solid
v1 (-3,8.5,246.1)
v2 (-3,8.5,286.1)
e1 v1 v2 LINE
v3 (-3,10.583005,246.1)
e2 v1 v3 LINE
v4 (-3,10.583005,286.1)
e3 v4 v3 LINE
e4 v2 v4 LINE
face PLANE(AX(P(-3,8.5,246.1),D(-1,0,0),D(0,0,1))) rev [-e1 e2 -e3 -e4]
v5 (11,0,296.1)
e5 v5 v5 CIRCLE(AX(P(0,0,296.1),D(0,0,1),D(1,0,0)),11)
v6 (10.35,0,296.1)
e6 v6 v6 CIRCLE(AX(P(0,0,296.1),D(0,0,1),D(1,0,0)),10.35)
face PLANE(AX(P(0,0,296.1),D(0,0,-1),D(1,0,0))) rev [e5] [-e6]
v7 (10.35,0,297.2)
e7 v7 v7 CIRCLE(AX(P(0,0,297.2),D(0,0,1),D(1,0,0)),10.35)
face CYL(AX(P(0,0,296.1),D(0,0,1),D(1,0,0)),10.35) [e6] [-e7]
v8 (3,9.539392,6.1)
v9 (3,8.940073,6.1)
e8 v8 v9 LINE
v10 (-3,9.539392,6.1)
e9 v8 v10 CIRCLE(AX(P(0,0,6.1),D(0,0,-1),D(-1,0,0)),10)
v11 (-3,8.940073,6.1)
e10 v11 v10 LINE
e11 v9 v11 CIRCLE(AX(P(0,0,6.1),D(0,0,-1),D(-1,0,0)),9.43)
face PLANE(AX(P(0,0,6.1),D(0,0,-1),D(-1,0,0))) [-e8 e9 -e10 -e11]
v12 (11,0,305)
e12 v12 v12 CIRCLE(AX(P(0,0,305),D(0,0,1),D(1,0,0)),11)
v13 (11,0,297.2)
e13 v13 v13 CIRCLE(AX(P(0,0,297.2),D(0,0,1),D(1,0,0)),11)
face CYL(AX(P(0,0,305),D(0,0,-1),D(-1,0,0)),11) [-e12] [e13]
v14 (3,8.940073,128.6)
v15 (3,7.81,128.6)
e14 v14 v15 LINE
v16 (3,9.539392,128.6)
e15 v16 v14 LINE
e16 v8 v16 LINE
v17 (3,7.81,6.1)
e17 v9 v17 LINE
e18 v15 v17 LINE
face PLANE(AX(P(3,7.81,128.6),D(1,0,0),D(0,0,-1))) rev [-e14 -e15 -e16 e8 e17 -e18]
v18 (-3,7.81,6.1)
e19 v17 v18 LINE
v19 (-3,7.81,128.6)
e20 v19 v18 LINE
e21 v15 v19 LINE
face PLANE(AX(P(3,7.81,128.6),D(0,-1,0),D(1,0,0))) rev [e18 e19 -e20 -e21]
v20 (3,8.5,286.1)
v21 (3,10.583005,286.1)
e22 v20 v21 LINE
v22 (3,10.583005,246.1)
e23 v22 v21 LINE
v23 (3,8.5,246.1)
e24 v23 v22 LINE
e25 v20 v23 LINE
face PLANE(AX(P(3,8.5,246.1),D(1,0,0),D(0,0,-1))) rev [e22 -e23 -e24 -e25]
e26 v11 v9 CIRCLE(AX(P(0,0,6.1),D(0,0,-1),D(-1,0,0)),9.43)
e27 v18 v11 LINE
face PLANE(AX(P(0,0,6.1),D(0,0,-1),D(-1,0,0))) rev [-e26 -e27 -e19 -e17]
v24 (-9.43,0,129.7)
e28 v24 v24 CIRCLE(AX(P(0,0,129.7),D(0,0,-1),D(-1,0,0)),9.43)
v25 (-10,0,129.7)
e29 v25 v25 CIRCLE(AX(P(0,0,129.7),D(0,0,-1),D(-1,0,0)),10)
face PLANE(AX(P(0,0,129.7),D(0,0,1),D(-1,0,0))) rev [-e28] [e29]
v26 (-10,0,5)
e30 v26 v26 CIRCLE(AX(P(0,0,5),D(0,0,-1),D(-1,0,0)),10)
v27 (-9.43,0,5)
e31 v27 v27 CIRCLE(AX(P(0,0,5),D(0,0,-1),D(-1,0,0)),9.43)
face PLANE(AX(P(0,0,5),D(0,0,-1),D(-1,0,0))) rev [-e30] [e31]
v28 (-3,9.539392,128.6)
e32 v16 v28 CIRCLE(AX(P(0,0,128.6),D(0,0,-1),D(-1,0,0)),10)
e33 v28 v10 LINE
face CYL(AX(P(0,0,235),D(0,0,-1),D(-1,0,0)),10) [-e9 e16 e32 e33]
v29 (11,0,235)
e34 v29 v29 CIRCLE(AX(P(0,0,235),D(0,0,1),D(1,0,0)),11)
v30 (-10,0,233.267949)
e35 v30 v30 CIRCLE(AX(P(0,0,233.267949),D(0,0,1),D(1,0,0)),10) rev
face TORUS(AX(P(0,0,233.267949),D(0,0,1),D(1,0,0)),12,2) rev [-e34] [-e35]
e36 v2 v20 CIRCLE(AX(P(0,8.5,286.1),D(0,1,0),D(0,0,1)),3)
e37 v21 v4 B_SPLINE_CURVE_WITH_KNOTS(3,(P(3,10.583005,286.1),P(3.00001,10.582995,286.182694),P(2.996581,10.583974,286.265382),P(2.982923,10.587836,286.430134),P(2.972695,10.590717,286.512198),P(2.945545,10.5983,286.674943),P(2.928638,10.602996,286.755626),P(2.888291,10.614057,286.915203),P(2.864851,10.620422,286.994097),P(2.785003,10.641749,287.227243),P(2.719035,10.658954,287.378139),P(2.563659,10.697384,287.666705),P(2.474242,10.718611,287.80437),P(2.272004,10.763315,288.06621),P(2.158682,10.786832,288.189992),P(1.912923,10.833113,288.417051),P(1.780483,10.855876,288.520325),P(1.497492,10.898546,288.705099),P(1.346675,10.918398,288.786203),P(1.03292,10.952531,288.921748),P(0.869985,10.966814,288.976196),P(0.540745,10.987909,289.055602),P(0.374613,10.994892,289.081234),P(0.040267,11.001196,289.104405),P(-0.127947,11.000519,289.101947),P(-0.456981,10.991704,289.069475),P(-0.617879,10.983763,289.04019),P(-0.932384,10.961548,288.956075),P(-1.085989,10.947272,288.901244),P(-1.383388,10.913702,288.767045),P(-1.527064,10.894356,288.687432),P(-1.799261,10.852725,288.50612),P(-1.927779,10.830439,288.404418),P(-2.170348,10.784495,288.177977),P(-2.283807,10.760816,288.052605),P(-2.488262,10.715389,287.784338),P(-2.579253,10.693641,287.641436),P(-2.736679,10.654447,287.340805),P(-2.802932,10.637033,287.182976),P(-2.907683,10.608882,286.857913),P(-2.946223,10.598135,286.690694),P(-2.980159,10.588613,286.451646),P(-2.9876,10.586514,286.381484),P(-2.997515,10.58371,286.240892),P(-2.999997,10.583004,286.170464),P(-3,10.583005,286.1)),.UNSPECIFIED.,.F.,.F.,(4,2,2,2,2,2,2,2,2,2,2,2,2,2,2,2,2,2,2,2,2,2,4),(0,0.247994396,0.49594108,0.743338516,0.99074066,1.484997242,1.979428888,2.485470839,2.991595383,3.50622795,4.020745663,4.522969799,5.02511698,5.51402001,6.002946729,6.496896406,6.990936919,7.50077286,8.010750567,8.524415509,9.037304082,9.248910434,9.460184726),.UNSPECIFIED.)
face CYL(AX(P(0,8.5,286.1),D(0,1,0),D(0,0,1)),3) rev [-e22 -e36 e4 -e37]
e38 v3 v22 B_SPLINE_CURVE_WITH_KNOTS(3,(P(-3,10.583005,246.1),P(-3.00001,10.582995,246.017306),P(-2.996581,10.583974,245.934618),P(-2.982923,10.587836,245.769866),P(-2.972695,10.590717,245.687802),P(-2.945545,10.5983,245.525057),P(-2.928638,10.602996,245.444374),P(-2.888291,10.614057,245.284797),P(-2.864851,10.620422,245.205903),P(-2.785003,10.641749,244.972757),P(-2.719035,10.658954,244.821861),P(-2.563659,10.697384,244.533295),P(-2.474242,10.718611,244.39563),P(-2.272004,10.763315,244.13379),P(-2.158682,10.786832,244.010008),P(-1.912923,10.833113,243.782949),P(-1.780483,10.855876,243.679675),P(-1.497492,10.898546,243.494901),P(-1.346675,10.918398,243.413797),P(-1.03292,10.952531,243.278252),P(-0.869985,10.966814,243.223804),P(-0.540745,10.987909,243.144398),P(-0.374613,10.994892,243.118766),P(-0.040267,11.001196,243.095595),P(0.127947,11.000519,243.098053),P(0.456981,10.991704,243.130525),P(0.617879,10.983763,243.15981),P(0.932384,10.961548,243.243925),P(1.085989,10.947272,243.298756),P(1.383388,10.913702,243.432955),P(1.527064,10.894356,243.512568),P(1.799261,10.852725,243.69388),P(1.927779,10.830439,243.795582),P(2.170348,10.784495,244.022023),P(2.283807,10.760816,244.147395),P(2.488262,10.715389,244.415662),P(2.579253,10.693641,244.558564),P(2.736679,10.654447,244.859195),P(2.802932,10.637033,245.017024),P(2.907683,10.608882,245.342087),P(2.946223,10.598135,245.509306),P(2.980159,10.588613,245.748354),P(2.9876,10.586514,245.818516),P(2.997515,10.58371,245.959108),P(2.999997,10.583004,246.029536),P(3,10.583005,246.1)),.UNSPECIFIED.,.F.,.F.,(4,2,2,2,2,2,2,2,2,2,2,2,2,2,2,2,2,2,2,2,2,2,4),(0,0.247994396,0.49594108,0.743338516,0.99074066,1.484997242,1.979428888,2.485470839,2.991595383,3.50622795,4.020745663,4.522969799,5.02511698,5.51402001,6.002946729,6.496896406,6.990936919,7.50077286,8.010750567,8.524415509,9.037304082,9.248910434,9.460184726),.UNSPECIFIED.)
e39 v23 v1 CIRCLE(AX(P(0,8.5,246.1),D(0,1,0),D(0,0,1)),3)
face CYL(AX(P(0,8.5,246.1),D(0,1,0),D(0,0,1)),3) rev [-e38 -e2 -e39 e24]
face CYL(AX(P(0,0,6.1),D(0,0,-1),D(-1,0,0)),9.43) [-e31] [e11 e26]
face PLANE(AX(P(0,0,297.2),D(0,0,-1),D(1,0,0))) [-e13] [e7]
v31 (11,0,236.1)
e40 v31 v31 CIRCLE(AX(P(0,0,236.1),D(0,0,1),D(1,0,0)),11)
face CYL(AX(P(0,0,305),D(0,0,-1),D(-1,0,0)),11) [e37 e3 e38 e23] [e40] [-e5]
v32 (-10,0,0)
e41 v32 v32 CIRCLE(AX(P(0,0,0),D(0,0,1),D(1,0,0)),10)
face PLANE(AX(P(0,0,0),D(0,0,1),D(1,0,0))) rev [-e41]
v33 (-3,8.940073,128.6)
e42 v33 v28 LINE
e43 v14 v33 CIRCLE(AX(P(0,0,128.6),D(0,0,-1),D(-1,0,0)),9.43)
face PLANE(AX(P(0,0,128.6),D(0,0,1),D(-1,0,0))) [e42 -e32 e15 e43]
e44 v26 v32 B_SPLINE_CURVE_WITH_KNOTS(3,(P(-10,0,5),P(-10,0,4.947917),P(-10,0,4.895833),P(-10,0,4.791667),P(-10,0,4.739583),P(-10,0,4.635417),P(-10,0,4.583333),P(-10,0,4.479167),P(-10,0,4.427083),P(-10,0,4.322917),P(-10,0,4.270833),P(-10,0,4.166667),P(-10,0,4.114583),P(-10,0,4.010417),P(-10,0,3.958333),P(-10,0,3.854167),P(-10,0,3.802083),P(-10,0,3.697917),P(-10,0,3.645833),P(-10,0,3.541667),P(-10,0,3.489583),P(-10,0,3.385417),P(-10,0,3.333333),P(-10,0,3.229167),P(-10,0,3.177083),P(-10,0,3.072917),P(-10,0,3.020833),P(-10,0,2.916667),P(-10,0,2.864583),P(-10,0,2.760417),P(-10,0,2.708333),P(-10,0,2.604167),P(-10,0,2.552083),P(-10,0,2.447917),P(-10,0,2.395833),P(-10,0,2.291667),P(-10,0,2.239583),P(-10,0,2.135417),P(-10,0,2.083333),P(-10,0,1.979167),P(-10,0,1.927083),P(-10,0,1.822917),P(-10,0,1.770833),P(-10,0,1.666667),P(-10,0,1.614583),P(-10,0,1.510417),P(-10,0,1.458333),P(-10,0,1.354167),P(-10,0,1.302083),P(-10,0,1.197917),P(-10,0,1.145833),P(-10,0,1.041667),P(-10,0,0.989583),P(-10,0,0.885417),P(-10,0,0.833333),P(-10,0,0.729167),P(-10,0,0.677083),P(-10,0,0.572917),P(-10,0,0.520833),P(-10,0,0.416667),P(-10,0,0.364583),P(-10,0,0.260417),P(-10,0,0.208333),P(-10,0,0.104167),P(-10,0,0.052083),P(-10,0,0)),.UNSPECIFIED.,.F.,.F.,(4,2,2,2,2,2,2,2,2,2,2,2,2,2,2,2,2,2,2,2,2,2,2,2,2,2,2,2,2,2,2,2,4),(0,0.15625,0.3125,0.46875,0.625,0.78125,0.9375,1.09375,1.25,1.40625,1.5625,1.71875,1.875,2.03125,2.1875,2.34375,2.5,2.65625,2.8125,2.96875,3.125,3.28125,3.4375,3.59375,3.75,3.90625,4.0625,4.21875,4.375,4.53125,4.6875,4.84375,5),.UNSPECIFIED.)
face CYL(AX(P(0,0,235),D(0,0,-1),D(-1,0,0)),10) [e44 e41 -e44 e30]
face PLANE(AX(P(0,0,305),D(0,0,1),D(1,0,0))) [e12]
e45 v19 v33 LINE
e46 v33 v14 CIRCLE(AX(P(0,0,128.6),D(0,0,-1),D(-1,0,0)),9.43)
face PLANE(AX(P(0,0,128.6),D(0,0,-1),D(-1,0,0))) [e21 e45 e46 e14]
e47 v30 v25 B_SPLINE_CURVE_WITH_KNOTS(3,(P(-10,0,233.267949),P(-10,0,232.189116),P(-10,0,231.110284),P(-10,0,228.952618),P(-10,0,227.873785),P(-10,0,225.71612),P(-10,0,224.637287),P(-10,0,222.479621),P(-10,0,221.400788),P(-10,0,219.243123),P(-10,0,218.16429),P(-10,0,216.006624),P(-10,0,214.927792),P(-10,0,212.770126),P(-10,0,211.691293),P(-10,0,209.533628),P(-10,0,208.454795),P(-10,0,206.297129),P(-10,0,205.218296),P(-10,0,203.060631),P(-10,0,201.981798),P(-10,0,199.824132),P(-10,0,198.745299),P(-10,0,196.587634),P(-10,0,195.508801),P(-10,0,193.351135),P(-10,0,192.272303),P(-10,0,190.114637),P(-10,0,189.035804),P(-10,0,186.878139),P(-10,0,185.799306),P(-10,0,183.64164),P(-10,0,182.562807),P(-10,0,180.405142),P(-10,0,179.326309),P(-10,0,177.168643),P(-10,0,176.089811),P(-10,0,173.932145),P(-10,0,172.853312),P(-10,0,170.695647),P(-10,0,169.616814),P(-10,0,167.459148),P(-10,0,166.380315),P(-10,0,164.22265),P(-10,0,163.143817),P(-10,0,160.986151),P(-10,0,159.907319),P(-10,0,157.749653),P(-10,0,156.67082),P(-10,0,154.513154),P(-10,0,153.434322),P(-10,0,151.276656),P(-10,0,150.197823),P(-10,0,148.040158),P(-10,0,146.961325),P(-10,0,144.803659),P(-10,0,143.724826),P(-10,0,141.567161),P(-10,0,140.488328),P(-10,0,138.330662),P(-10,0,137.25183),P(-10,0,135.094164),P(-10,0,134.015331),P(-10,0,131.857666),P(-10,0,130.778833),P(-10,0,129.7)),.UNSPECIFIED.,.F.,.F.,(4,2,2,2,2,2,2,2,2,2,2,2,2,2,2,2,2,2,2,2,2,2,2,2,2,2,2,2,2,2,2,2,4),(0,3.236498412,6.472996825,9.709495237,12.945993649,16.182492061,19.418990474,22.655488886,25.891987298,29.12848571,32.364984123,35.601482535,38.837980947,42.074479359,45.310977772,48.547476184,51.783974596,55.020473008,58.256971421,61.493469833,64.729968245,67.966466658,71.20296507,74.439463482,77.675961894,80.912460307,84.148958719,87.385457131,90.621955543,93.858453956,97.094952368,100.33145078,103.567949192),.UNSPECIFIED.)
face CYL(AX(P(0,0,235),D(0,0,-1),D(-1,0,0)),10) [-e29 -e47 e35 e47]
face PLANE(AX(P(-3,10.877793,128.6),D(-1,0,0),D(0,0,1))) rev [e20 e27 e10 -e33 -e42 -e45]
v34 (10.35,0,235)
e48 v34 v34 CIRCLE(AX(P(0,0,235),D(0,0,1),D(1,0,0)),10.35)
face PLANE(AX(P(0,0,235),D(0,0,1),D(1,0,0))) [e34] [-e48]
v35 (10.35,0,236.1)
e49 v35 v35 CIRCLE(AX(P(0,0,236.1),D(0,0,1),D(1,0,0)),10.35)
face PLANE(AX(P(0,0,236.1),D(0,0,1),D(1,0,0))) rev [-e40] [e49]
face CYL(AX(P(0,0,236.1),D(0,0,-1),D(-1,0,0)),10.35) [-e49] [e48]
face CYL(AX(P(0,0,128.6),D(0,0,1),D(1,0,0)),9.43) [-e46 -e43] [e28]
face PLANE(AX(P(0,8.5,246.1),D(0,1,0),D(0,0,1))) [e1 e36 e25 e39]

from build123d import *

# Parameters (mm, degrees)
SKETCH2_R           = 10
BOSS_EXTRUDE1_DEPTH = 235
SKETCH3_R           = 10
SKETCH3_R_2         = 9.43
CUT_EXTRUDE2_DEPTH  = 1.1
SKETCH4_W           = 6
SKETCH4_H           = 3.067792635
CUT_EXTRUDE3_DEPTH  = 61.25
SKETCH5_R           = 11
BOSS_EXTRUDE2_DEPTH = 70
FILLET3_R           = 2
SKETCH6_R           = 11
SKETCH6_R_2         = 10.35
CUT_EXTRUDE4_DEPTH  = 1.1
CUT_EXTRUDE5_DEPTH  = 2.5


with BuildPart() as part:
    # Sketch2 → Boss-Extrude1 (new body)
    with BuildSketch(Plane.XY):
        with Locations(Location((0, 0, 0), (0, 0, 180))):
            Circle(SKETCH2_R)
    extrude(amount=BOSS_EXTRUDE1_DEPTH)

    # Sketch3 → Cut-Extrude2 (cut)
    with BuildSketch(Plane(origin=(0, 0, 5), x_dir=(-1, 0, 0), z_dir=(0, 0, -1))):
        Circle(SKETCH3_R)
        Circle(SKETCH3_R_2, mode=Mode.SUBTRACT)
    cut_extrude2 = extrude(amount=-CUT_EXTRUDE2_DEPTH, mode=Mode.SUBTRACT)

    # Mirror1: Cut-Extrude2 across plane
    add(cut_extrude2.mirror(Plane(origin=(0, 0, 67.35), x_dir=(1, 0, 0), z_dir=(0, 0, -1))), mode=Mode.SUBTRACT)

    # Sketch4 → Cut-Extrude3 (cut, symmetric)
    with BuildSketch(Plane(origin=(0, 0, 67.35), x_dir=(-1, 0, 0), z_dir=(0, 0, -1))):
        with Locations((0, 9.343896318)):
            Rectangle(SKETCH4_W, SKETCH4_H)
    extrude(amount=CUT_EXTRUDE3_DEPTH, both=True, mode=Mode.SUBTRACT)

    # Sketch5 → Boss-Extrude2 (add)
    with BuildSketch(Plane.XY.offset(235)):
        Circle(SKETCH5_R)
    extrude(amount=BOSS_EXTRUDE2_DEPTH)

    # Fillet3
    # the kernel refuses this fillet: 2 mm, written as the material it adds along each edge
    with BuildSketch(Plane(origin=(0, 0, 235), x_dir=(-1, 0, 0), z_dir=(0, 1, 0))) as fillet3_piece_1:
        with BuildLine():
            CenterArc((12, -1.732050808), FILLET3_R, 120, 60)
            Line((10, -1.732050808), (9.96, -1.732050808))
            Line((9.96, -1.732050808), (9.96, 0))
            Line((9.96, 0), (10, 0.04))
            ThreePointArc((10, 0.04), (10.5, 0.04), (10.98, 0.034641016))
            Line((10.98, 0.034641016), (11, 0))
        make_face()
    revolve(axis=Axis((0, 0, 235), (0, 0, 1)))

    # Sketch6 → Cut-Extrude4 (cut)
    with BuildSketch(Plane.XY.offset(235)):
        Circle(SKETCH6_R)
        Circle(SKETCH6_R_2, mode=Mode.SUBTRACT)
    cut_extrude4 = extrude(amount=CUT_EXTRUDE4_DEPTH, mode=Mode.SUBTRACT)

    # Mirror2: Cut-Extrude4 across plane
    add(cut_extrude4.mirror(Plane.XY.offset(266.1)), mode=Mode.SUBTRACT)

    # Sketch8 → Cut-Extrude5 (cut)
    with BuildSketch(Plane(origin=(0, 11, 0), x_dir=(1, 0, 0), z_dir=(0, 1, 0))):
        with BuildLine():
            Line((3, -246.1), (3, -286.1))
            ThreePointArc((3, -286.1), (0, -289.1), (-3, -286.1))
            Line((-3, -286.1), (-3, -246.1))
            ThreePointArc((-3, -246.1), (0, -243.1), (3, -246.1))
        make_face()
    extrude(amount=-CUT_EXTRUDE5_DEPTH, mode=Mode.SUBTRACT)


solid = part.part
